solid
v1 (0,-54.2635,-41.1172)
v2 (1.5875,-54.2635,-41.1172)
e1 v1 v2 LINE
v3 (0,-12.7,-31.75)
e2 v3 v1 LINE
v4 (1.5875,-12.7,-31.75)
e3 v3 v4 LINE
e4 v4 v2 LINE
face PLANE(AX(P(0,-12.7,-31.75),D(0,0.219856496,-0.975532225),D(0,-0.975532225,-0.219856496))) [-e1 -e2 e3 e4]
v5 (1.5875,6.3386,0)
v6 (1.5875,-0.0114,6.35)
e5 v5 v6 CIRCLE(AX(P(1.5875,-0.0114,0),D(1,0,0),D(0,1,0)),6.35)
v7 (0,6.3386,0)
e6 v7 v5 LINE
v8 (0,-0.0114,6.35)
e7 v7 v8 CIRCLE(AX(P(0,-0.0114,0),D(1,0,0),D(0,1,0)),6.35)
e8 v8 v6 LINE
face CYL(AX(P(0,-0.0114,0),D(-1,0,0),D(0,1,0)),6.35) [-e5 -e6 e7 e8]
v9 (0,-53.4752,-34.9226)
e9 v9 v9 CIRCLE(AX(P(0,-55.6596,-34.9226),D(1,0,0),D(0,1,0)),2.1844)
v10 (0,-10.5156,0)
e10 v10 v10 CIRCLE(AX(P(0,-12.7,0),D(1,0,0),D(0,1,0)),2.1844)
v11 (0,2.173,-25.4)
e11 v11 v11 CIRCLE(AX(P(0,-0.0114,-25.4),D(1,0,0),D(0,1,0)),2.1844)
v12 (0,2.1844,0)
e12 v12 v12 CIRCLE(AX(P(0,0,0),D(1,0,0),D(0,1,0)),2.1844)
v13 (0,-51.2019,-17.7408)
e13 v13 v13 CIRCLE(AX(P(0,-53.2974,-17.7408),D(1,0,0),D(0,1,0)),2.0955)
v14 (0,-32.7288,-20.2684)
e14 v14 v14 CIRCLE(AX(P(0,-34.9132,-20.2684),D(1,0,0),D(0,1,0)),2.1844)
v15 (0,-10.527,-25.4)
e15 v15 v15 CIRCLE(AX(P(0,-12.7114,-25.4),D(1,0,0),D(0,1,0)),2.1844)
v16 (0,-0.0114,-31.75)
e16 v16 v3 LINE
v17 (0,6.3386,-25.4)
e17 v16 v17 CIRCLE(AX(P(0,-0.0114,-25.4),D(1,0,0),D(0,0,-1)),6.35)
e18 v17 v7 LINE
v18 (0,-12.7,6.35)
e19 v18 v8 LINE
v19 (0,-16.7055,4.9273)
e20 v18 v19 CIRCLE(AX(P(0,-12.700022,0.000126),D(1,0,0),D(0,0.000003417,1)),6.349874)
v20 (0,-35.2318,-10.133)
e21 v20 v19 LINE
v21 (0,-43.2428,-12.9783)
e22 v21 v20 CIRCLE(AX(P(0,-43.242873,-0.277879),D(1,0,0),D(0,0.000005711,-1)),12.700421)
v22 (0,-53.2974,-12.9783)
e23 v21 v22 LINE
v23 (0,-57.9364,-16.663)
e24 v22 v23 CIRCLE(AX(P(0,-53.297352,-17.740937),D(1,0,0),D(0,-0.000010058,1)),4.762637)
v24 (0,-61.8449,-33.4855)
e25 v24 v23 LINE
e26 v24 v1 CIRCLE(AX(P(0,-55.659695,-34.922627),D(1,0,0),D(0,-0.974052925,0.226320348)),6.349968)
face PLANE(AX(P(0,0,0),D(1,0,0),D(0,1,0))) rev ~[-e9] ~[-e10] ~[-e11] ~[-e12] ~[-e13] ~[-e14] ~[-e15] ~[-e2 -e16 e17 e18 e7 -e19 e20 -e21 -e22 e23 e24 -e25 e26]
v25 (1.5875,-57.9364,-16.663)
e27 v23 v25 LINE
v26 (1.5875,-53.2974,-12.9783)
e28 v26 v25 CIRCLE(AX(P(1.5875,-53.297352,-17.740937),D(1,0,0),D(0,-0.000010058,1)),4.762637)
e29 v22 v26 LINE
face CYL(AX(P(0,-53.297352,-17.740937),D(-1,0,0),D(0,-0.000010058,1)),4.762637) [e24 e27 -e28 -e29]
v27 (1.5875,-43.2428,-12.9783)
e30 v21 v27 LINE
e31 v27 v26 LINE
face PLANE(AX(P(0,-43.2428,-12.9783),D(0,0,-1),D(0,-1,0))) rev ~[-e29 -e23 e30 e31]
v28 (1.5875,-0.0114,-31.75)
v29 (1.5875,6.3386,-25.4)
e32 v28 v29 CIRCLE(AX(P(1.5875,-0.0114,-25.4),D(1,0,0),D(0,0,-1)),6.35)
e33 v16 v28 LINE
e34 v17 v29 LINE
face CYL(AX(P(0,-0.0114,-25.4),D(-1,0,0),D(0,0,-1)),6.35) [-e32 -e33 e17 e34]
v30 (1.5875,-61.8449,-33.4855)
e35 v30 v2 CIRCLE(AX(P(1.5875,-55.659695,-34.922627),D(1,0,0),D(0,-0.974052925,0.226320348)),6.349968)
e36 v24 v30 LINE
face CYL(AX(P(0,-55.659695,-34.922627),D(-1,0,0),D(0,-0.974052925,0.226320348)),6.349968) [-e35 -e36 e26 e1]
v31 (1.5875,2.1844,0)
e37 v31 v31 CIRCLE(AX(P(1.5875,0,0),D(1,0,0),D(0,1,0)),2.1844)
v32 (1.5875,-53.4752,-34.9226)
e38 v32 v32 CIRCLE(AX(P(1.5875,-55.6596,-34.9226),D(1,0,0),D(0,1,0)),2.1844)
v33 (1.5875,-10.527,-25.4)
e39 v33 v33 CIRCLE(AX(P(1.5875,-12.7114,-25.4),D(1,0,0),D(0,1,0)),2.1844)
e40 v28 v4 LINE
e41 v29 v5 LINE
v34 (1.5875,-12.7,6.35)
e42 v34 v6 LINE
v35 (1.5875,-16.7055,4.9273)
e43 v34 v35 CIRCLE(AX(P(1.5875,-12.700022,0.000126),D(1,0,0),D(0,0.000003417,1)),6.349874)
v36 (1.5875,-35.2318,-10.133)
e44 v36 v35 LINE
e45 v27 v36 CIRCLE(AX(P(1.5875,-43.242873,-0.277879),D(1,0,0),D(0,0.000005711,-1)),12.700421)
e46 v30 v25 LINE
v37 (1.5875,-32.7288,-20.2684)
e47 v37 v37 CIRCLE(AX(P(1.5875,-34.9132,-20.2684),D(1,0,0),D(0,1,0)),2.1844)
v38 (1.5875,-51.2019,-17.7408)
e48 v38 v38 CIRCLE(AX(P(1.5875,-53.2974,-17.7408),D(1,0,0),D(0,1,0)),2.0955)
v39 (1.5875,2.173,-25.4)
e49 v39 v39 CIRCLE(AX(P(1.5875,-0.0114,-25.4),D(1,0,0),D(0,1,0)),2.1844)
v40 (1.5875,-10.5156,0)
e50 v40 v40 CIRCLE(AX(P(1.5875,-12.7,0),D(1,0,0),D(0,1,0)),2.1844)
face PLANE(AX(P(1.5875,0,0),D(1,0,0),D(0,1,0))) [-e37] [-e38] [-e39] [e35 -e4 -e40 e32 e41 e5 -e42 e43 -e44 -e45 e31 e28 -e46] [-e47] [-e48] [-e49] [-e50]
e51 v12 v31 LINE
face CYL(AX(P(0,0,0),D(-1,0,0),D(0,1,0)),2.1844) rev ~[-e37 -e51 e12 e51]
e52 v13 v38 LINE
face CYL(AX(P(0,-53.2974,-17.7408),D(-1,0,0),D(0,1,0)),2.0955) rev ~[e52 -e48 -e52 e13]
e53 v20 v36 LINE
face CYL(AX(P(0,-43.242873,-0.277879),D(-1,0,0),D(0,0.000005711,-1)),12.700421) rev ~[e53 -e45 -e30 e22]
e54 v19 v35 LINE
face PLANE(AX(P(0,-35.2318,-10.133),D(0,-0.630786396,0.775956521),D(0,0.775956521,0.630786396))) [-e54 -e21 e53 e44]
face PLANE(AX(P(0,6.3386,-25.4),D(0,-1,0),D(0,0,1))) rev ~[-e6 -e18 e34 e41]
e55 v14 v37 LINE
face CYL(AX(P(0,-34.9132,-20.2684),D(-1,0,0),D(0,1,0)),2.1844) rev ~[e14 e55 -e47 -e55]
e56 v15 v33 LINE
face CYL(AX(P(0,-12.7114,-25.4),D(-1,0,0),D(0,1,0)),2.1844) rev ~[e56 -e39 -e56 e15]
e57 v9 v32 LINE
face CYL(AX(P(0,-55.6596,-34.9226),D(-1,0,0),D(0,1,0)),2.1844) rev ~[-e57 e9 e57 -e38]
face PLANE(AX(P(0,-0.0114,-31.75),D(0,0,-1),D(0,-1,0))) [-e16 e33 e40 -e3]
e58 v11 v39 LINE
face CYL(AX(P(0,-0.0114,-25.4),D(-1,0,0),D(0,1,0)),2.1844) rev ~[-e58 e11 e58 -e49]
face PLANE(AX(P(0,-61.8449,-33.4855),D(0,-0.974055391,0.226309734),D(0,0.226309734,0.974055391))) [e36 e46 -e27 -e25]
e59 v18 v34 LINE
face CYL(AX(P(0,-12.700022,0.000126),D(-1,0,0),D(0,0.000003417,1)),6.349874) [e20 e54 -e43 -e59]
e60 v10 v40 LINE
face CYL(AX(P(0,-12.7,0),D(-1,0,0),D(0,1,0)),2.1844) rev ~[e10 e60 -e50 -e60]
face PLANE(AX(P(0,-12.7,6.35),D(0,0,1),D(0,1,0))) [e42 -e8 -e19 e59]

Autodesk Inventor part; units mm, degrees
ref_plane "YZ Plane" through (0, 0, 0) normal (1, 0, 0) x (0, 1, 0)
ref_plane "XZ Plane" through (0, 0, 0) normal (0, 1, 0) x (-1, 0, 0)
ref_plane "XY Plane" through (0, 0, 0) normal (0, 0, 1) x (1, 0, 0)
sketch "maiin" plane through (0, 0, 0) normal (0, 0, 1) x (1, 0, 0)
  circle A0 centre (-6.5018, 3.4753) radius 2.1844
  line L0 (-6.8203, 13.6107) -> (11.7059, 28.671)
  circle A1 centre (-27.2482, -11.1789) radius 2.1844
  arc A2 (-33.4335, -9.7418) -> (-25.8521, -17.3735) centre (-27.2482, -11.1789) ccw
  line L1 (34.75, -1.6563) -> (34.75, 23.7437)
  line L2 (15.7114, 30.0937) -> (28.4, 30.0937)
  circle A3 centre (28.4114, 23.7437) radius 2.1844
  circle A4 centre (28.4, -1.6563) radius 2.1844
  circle A5 centre (15.7114, 23.7437) radius 2.1844
  circle A6 centre (15.7, -1.6563) radius 2.1844
  arc A7 (34.75, 23.7437) -> (28.4, 30.0937) centre (28.4, 23.7437) ccw
  arc A8 (15.7114, 30.0937) -> (11.7059, 28.671) centre (15.7114, 23.7437) ccw
  arc A9 (28.4, -8.0063) -> (34.75, -1.6563) centre (28.4, -1.6563) ccw
  line L3 (28.4, -8.0063) -> (15.7114, -8.0063)
  line L4 (15.7114, -8.0063) -> (-25.8521, -17.3735)
  circle A10 centre (-24.886, 6.0028) radius 2.0955
  arc A11 (-24.886, 10.7653) -> (-29.5249, 7.0806) centre (-24.886, 6.0028) ccw
  line L5 (-33.4335, -9.7418) -> (-29.5249, 7.0806)
  line L6 (-14.8313, 10.7653) -> (-24.886, 10.7653)
  arc A12 (-14.8313, 10.7653) -> (-6.8203, 13.6107) centre (-14.8313, 23.4653) ccw
  point P0 (10.0881, 4.3711)
  point P1 (32.8902, 28.2338)
  dimension "d0" = 12.7
  dimension "d6" = 4.3688
  dimension "d9" = 12.7
  dimension "d10" = 25.4
  dimension "d11" = 12.7
  dimension "d12" = 25.4
  dimension "d14" = 4.191
  dimension "d15" = 9.525
  dimension "d16" = 12.7
sketch "Sketch1" plane through (0, 0, 0) normal (1, 0, 0) x (0, 1, 0)
  circle A0 centre (-34.9132, -20.2684) radius 2.1844
  line L0 (-35.2318, -10.133) -> (-16.7055, 4.9273)
  circle A1 centre (-55.6596, -34.9226) radius 2.1844
  arc A2 (-61.8449, -33.4855) -> (-54.2635, -41.1172) centre (-55.6596, -34.9226) ccw
  line L1 (6.3386, -25.4) -> (6.3386, 0)
  line L2 (-12.7, 6.35) -> (-0.0114, 6.35)
  circle A3 centre (0, 0) radius 2.1844
  circle A4 centre (-0.0114, -25.4) radius 2.1844
  circle A5 centre (-12.7, 0) radius 2.1844
  circle A6 centre (-12.7114, -25.4) radius 2.1844
  arc A7 (6.3386, 0) -> (-0.0114, 6.35) centre (-0.0114, 0) ccw
  arc A8 (-12.7, 6.35) -> (-16.7055, 4.9273) centre (-12.7, 0) ccw
  arc A9 (-0.0114, -31.75) -> (6.3386, -25.4) centre (-0.0114, -25.4) ccw
  line L3 (-0.0114, -31.75) -> (-12.7, -31.75)
  line L4 (-12.7, -31.75) -> (-54.2635, -41.1172)
  circle A10 centre (-53.2974, -17.7408) radius 2.0955
  arc A11 (-53.2974, -12.9783) -> (-57.9364, -16.663) centre (-53.2974, -17.7408) ccw
  line L5 (-61.8449, -33.4855) -> (-57.9364, -16.663)
  line L6 (-43.2428, -12.9783) -> (-53.2974, -12.9783)
  arc A12 (-43.2428, -12.9783) -> (-35.2318, -10.133) centre (-43.2428, -0.2783) ccw
extrude "Extrusion1" add sketch "Sketch1" along normal blind 1.5875
properties part number "Angle Brace Gusset" material "Acetal Resin, White"
